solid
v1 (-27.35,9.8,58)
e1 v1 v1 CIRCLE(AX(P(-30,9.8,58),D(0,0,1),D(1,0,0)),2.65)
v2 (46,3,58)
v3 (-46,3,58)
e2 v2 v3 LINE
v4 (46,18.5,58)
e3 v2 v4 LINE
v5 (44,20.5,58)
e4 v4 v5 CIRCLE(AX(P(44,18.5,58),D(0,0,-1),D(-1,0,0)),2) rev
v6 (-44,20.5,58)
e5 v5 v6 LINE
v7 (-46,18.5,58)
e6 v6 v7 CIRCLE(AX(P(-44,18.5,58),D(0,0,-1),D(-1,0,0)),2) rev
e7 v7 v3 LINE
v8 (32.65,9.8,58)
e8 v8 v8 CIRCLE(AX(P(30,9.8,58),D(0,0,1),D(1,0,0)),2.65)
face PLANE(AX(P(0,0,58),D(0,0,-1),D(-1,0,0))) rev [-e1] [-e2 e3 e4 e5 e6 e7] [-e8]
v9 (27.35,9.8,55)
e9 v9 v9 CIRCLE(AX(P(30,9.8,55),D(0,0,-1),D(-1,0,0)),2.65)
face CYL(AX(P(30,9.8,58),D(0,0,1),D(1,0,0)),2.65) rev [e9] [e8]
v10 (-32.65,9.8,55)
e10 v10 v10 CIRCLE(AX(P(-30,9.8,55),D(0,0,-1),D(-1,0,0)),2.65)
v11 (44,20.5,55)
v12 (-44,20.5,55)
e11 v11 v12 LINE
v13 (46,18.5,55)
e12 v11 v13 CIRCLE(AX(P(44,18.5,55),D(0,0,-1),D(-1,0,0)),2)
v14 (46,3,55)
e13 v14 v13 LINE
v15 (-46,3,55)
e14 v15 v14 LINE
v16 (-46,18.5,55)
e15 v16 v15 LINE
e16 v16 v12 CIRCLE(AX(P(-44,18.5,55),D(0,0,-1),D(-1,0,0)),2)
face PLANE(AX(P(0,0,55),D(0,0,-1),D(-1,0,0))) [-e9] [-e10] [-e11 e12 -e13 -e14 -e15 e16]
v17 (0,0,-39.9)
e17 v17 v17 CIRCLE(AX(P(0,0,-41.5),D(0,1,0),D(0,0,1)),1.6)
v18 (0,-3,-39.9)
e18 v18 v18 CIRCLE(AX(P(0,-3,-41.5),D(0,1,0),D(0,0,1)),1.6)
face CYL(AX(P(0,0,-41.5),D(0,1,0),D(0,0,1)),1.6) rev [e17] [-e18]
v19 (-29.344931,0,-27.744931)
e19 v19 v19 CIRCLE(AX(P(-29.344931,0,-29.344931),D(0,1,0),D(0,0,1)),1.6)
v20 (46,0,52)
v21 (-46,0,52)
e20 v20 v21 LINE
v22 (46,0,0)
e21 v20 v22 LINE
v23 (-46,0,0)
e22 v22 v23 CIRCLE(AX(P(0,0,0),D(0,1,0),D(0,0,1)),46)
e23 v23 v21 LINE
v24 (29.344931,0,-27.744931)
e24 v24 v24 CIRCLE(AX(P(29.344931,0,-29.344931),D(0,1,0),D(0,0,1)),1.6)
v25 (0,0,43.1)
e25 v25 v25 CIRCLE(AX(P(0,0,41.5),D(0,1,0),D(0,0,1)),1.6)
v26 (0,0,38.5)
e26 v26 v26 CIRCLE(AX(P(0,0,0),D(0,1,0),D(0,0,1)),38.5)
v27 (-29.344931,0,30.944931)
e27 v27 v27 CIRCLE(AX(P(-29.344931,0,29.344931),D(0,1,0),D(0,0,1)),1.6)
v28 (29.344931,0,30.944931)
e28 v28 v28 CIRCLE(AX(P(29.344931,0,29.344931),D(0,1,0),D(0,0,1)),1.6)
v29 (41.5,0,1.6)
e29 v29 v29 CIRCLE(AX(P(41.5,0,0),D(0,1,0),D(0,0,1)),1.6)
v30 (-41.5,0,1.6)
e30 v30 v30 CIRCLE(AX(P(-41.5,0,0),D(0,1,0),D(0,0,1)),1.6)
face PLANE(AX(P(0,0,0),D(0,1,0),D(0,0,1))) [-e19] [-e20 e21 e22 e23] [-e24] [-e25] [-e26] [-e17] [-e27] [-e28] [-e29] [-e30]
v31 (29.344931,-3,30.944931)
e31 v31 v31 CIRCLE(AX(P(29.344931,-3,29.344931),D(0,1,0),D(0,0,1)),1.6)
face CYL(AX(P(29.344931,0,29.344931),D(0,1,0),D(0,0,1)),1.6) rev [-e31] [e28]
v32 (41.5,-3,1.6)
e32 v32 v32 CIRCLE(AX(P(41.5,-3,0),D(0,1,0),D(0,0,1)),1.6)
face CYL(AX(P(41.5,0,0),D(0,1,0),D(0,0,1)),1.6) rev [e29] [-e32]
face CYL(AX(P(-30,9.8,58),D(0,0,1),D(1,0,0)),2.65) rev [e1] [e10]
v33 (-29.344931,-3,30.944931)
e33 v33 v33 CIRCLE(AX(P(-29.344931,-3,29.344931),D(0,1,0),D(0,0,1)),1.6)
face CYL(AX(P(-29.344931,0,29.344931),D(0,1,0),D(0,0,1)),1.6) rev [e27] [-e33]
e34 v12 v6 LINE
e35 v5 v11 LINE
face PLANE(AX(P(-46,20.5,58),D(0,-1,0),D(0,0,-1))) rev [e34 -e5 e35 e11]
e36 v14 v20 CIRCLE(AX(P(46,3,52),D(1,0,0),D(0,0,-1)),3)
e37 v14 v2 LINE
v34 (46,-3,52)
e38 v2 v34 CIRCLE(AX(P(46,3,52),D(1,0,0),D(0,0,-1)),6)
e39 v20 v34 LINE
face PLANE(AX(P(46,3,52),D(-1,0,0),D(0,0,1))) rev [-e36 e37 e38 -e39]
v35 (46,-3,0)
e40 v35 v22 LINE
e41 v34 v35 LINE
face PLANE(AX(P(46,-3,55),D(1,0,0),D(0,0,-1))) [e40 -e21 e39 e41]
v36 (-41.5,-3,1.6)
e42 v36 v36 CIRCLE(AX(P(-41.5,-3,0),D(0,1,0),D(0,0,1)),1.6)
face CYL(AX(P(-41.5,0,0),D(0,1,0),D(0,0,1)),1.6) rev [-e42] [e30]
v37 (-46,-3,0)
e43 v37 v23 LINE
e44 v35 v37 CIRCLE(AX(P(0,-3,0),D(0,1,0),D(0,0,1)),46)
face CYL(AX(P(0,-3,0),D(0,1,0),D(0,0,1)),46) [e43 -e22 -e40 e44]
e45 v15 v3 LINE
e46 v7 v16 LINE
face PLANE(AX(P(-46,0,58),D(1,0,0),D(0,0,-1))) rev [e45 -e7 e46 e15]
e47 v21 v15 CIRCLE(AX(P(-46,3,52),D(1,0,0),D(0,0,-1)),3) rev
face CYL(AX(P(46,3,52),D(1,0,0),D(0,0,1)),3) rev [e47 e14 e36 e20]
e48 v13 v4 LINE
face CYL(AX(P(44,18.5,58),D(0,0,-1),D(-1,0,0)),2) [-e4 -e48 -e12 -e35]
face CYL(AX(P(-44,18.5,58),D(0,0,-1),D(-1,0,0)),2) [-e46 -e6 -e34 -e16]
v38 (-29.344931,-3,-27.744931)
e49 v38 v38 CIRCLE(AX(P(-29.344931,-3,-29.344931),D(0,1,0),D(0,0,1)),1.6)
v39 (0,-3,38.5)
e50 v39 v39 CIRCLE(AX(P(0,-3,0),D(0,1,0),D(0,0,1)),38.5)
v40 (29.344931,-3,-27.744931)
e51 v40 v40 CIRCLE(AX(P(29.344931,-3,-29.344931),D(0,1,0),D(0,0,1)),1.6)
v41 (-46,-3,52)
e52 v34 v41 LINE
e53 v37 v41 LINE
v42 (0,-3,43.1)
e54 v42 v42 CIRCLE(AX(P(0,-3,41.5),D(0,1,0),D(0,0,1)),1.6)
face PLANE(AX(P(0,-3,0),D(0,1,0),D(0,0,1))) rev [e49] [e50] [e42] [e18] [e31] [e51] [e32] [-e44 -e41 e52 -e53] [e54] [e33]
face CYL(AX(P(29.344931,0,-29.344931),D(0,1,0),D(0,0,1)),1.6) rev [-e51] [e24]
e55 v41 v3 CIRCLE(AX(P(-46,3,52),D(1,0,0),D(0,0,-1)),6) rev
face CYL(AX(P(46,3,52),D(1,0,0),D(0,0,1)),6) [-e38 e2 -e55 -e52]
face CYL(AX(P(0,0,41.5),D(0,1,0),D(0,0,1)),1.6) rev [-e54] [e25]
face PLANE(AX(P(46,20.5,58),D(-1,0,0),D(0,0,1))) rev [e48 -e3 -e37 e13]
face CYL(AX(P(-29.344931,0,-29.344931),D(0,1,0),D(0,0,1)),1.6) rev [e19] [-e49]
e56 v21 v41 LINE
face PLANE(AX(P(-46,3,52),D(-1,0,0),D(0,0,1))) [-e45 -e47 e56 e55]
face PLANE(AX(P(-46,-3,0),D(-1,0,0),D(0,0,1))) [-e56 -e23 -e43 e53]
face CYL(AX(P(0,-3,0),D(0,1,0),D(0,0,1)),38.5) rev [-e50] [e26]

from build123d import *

# Parameters (mm, degrees)
SKETCH1_R                    = 38.5
SKETCH1_R_2                  = 1
BASE_FLANGE1_DEPTH           = 3
EDGE_FLANGE1_STRIP_W         = 18
EDGE_FLANGE1_STRIP_H         = 3
EDGE_FLANGE1_STRIP_CUT_DEPTH = 92
EDGE_FLANGE1_DEPTH           = 92
EDGE_FLANGE1_START           = 3
EDGE_FLANGE1_PROFILE_W       = 92
EDGE_FLANGE1_PROFILE_H       = 17.5
EDGE_FLANGE1_PROFILE_R       = 1
EDGE_FLANGE1_FLAT_DEPTH      = 3
FILLET1_R                    = 2
M3_CLEARANCE_HOLE1_D         = 3.2
M3_CLEARANCE_HOLE1_DEPTH     = 136
M3_CLEARANCE_HOLE1_TIP       = 0.96137699
M5_CLEARANCE_HOLE1_D         = 5.3
M5_CLEARANCE_HOLE1_DEPTH     = 136
M5_CLEARANCE_HOLE1_TIP       = 1.59228064


# Sheet-metal steps are written as plain solids
with BuildPart() as part:
    # Sketch1 → Base-Flange1 (new body)
    with BuildSketch(Plane(origin=(0, 0, 0), x_dir=(1, 0, 0), z_dir=(0, 1, 0))):
        with BuildLine():
            Line((-46, 0), (-46, -55))
            Line((-46, -55), (46, -55))
            Line((46, -55), (46, 0))
            ThreePointArc((46, 0), (0, 46), (-46, 0))
        make_face()
        with Locations(Location((0, 0, 0), (0, 0, 270))):
            Circle(SKETCH1_R, mode=Mode.SUBTRACT)
        with Locations(Location((0, 41.5, 0), (0, 0, 270))):
            Circle(SKETCH1_R_2, mode=Mode.SUBTRACT)
        with Locations(Location((29.344931419, 29.344931419, 0), (0, 0, 270))):
            Circle(SKETCH1_R_2, mode=Mode.SUBTRACT)
        with Locations(Location((41.5, 0, 0), (0, 0, 270))):
            Circle(SKETCH1_R_2, mode=Mode.SUBTRACT)
        with Locations(Location((29.344931419, -29.344931419, 0), (0, 0, 270))):
            Circle(SKETCH1_R_2, mode=Mode.SUBTRACT)
        with Locations(Location((0, -41.5, 0), (0, 0, 270))):
            Circle(SKETCH1_R_2, mode=Mode.SUBTRACT)
        with Locations(Location((-29.344931419, -29.344931419, 0), (0, 0, 270))):
            Circle(SKETCH1_R_2, mode=Mode.SUBTRACT)
        with Locations(Location((-41.5, 0, 0), (0, 0, 270))):
            Circle(SKETCH1_R_2, mode=Mode.SUBTRACT)
        with Locations(Location((-29.344931419, 29.344931419, 0), (0, 0, 270))):
            Circle(SKETCH1_R_2, mode=Mode.SUBTRACT)
    extrude(amount=-BASE_FLANGE1_DEPTH)

    # Edge-Flange1 strip (across the edge) → Edge-Flange1 strip cut (cut)
    with BuildSketch(Plane(origin=(-46, 0, 55), x_dir=(0, 0, -1), z_dir=(1, 0, 0))):
        with Locations((-6, -1.5)):
            Rectangle(EDGE_FLANGE1_STRIP_W, EDGE_FLANGE1_STRIP_H)
    extrude(amount=EDGE_FLANGE1_STRIP_CUT_DEPTH, mode=Mode.SUBTRACT)

    # Edge-Flange1 bend section (across the edge) → Edge-Flange1 (add)
    with BuildSketch(Plane(origin=(-46, 0, 55), x_dir=(0, 0, -1), z_dir=(1, 0, 0))):
        with BuildLine():
            Line((-3, 3), (0, 3))
            ThreePointArc((0, 3), (0.878679656, 0.878679656), (3, 0))
            Line((3, 0), (3, -3))
            ThreePointArc((3, -3), (-1.242640687, -1.242640687), (-3, 3))
        make_face()
    extrude(amount=EDGE_FLANGE1_DEPTH)

    # Edge-Flange1 profile (on flange) → Edge-Flange1 flat (add)
    with BuildSketch(Plane.XY.offset(55).offset(EDGE_FLANGE1_START)):
        with Locations((0, 11.75)):
            Rectangle(EDGE_FLANGE1_PROFILE_W, EDGE_FLANGE1_PROFILE_H)
        with Locations((-30, 9.8)):
            Circle(EDGE_FLANGE1_PROFILE_R, mode=Mode.SUBTRACT)
        with Locations((30, 9.8)):
            Circle(EDGE_FLANGE1_PROFILE_R, mode=Mode.SUBTRACT)
    extrude(amount=-EDGE_FLANGE1_FLAT_DEPTH)

    # Fillet1
    fillet1_edges = [part.edges().sort_by_distance(p)[0] for p in [
        (-46, 20.5, 56.5),
        (46, 20.5, 56.5),
    ]]
    fillet(fillet1_edges, radius=FILLET1_R)

    # M3 Clearance Hole1
    with Locations(Plane(origin=(0, 0, 0), x_dir=(1, 0, 0), z_dir=(0, 1, 0))):
        with Locations((-29.344931419, 29.344931419), (0, 41.5), (-41.5, 0), (-29.344931419, -29.344931419), (0, -41.5), (29.344931419, -29.344931419), (41.5, 0), (29.344931419, 29.344931419)):
            Hole(M3_CLEARANCE_HOLE1_D / 2, depth=M3_CLEARANCE_HOLE1_DEPTH)
            with Locations((0, 0, -(M3_CLEARANCE_HOLE1_DEPTH + M3_CLEARANCE_HOLE1_TIP / 2))):  # 118° drill point
                Cone(0, M3_CLEARANCE_HOLE1_D / 2, M3_CLEARANCE_HOLE1_TIP, mode=Mode.SUBTRACT)

    # M5 Clearance Hole1
    with Locations(Plane.XY.offset(58)):
        with Locations((-30, 9.8), (30, 9.8)):
            Hole(M5_CLEARANCE_HOLE1_D / 2, depth=M5_CLEARANCE_HOLE1_DEPTH)
            with Locations((0, 0, -(M5_CLEARANCE_HOLE1_DEPTH + M5_CLEARANCE_HOLE1_TIP / 2))):  # 118° drill point
                Cone(0, M5_CLEARANCE_HOLE1_D / 2, M5_CLEARANCE_HOLE1_TIP, mode=Mode.SUBTRACT)


solid = part.part
